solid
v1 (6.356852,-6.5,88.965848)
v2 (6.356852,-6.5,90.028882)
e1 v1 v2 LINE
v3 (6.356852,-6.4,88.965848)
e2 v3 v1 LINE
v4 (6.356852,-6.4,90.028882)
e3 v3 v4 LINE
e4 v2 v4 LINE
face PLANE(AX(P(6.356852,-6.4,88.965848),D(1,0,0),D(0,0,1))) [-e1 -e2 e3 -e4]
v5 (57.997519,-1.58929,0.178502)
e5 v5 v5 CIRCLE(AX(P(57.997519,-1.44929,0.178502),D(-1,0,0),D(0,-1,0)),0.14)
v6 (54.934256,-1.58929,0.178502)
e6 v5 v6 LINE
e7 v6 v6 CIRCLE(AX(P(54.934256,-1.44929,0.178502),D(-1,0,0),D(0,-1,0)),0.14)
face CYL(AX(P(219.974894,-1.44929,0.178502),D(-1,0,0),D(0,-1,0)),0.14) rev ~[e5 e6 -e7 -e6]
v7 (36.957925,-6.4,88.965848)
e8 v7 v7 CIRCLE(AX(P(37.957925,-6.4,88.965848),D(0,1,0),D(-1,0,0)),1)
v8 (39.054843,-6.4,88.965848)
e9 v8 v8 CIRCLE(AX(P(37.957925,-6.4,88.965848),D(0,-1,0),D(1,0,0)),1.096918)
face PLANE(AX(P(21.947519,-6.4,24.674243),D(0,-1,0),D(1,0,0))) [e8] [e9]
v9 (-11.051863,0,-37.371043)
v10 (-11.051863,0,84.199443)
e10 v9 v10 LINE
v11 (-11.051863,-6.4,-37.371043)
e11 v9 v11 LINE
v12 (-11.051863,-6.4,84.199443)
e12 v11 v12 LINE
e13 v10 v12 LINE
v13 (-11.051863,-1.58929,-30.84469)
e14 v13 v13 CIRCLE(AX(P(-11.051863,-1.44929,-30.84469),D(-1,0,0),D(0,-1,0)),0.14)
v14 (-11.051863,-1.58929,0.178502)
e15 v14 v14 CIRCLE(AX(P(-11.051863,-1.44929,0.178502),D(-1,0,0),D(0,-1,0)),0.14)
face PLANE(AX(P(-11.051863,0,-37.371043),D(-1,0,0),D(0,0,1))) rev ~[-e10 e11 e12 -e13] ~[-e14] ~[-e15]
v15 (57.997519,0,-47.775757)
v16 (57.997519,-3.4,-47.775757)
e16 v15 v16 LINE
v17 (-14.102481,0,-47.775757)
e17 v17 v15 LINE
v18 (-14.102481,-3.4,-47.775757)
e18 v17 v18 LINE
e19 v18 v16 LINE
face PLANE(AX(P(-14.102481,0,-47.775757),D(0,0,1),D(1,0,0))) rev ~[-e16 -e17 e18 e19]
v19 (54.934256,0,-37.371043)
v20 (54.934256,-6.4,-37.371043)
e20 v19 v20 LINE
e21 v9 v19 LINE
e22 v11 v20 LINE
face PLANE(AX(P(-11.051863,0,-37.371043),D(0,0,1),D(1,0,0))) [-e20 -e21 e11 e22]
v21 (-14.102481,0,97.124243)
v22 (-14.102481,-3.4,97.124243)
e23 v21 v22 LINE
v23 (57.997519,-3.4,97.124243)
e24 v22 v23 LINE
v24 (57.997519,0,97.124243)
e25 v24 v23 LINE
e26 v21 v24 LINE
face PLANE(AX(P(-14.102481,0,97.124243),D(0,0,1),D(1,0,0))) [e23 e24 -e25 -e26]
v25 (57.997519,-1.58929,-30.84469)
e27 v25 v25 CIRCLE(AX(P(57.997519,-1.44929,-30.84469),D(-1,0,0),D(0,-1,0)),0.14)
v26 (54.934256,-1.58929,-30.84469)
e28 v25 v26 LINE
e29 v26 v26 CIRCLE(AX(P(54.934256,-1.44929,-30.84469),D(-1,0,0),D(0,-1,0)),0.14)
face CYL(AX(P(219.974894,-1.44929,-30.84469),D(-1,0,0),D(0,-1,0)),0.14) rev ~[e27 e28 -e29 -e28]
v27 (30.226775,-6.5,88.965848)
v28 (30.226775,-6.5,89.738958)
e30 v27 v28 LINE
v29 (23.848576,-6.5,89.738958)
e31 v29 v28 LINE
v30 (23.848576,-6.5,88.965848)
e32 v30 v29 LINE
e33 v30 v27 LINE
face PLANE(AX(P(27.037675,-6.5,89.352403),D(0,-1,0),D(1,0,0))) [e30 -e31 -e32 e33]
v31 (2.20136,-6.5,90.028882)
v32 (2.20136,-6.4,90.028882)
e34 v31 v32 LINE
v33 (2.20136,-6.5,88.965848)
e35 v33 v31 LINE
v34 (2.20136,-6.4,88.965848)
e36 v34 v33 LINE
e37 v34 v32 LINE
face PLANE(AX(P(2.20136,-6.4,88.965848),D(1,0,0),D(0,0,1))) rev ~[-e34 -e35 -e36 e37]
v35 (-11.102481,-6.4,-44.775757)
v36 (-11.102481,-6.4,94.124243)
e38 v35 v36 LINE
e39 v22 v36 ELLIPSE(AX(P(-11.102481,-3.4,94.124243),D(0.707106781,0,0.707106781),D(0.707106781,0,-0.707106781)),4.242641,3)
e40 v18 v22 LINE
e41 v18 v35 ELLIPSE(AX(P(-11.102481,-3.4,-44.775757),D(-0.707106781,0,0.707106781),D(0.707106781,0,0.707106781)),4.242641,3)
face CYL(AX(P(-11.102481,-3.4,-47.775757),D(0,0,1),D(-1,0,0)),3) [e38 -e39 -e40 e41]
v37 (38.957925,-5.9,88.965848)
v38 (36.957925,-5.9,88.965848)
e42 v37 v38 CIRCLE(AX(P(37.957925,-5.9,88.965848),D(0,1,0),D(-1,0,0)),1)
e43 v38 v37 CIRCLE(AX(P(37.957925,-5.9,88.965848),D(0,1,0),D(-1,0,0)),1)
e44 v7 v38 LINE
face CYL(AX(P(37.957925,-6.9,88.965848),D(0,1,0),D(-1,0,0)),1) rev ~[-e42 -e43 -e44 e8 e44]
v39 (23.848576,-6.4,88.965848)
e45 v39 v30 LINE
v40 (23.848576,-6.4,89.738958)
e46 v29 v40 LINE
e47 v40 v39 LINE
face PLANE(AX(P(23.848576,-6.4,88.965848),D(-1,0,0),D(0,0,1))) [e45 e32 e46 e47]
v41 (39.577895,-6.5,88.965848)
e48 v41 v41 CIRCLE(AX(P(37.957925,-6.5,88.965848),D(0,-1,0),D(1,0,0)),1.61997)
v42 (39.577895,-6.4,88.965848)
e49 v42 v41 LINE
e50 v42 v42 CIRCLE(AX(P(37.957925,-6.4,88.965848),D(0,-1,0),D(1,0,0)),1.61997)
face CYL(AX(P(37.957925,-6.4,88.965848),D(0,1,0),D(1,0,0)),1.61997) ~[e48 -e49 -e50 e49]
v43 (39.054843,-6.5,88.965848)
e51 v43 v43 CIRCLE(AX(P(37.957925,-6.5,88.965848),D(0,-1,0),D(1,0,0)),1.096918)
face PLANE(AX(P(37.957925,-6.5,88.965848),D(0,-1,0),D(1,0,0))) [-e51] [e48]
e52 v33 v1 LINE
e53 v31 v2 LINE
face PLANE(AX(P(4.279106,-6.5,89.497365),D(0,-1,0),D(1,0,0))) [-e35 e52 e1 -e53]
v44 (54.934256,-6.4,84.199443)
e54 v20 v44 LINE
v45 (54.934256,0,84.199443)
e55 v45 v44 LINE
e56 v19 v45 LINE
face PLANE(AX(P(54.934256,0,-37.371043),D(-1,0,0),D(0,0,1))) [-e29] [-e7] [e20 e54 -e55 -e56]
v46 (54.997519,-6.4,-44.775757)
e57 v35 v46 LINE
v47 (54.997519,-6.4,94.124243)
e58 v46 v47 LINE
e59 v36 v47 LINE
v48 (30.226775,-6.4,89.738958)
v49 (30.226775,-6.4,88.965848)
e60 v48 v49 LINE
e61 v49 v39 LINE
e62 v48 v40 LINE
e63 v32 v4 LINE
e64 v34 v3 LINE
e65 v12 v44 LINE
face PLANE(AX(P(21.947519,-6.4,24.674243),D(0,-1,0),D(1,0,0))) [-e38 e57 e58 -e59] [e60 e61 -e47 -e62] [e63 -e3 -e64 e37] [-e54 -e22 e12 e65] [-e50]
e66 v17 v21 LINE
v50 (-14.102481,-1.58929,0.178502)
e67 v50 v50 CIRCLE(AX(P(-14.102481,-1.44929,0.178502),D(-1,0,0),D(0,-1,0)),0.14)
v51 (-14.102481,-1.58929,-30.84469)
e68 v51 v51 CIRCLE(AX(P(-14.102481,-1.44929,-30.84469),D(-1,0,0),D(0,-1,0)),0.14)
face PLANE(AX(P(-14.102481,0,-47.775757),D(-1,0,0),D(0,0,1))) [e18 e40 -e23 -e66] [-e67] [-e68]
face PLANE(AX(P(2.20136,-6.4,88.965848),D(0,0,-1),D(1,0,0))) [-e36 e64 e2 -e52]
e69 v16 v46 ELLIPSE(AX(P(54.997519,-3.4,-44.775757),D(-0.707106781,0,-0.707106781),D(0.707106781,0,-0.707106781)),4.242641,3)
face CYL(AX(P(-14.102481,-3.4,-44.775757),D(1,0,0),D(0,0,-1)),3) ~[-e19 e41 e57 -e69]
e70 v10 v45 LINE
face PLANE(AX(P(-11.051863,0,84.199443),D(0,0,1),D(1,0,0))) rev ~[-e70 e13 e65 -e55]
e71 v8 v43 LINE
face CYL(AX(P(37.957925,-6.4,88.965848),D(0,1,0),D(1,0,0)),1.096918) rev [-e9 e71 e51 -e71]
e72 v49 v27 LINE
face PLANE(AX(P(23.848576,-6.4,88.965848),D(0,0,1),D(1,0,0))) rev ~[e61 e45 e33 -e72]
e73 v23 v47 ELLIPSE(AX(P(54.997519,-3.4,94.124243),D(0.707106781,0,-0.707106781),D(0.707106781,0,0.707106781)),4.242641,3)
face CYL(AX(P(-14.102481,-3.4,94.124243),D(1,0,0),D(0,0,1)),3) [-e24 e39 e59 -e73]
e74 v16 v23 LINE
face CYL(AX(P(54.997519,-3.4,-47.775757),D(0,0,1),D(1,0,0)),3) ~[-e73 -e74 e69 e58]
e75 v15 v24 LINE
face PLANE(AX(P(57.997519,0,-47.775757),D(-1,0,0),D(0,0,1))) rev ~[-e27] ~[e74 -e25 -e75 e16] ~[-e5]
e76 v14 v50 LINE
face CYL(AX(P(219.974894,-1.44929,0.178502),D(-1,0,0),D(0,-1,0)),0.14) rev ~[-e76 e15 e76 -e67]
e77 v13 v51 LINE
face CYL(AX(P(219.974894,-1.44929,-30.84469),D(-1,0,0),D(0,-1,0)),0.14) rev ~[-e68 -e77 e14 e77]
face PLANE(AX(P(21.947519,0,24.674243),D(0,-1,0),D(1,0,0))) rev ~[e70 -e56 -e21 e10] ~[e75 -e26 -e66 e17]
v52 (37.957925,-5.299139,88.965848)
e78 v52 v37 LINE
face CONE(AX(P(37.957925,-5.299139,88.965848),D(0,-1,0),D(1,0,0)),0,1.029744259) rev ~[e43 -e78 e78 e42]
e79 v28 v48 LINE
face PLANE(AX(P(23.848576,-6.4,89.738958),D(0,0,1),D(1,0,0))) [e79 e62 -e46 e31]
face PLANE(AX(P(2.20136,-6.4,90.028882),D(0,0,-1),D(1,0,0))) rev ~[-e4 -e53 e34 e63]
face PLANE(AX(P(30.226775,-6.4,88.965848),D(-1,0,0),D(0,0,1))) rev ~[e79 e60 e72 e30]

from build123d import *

# Parameters (mm, degrees)
F0_W      = 72.1
F0_H      = 144.9
F0_W_2    = 65.9861192107
F0_H_2    = 121.5704865754
F1_DEPTH  = 6.4
F2_R      = 3
F3_R      = 1.6199699766
F3_R_2    = 1.0969181454
F3_W      = 6.3781980425
F3_H      = 0.7731094956
F3_W_2    = 4.1554919444
F3_H_2    = 1.0630339384
F4_DEPTH  = 0.1
F6_D      = 0.28
F13_D     = 2
F13_DEPTH = 0.5
F13_TIP   = 0.600860619


# Not quite as in the source:
# - the program builds the solid bodies; features that only make, move or delete a surface that nothing else refers to are left out


with BuildPart() as f1:
    # F0 (on Front) → F1 (new body)
    with BuildSketch(Plane.XZ):
        with Locations((21.9475186944, 24.6742434323)):
            Rectangle(F0_W, F0_H)
        with Locations((21.9411961734, 23.4142001718)):
            Rectangle(F0_W_2, F0_H_2, mode=Mode.SUBTRACT)
    extrude(amount=F1_DEPTH)

    # F2
    f2_edges = [f1.edges().sort_by_distance(p)[0] for p in [
        (21.947519, -6.4, 97.124243),
        (-14.102481, -6.4, 24.674243),
        (21.947519, -6.4, -47.775757),
        (57.997519, -6.4, 24.674243),
    ]]
    fillet(f2_edges, radius=F2_R)

    # F3 (on face) → F4 (join, symmetric)
    with BuildSketch(Plane.XZ.offset(6.4)):
        with Locations((37.9579253495, 88.9658480883)):
            Circle(F3_R)
        with Locations((37.9579253495, 88.9658480883)):
            Circle(F3_R_2, mode=Mode.SUBTRACT)
        with Locations((27.0376754925, 89.3524028361)):
            Rectangle(F3_W, F3_H)
        with Locations((4.2791056912, 89.4973650575)):
            Rectangle(F3_W_2, F3_H_2)
    extrude(amount=F4_DEPTH, both=True)

    # F6 (through all)
    with Locations(Plane.YZ.offset(57.9975186944)):
        with Locations((-1.4492898481, -30.8446902782), (-1.4492898481, 0.1785024215)):
            Hole(F6_D / 2)

    # F13
    with Locations(Plane.XZ.offset(6.4)):
        with Locations((37.9579253495, 88.9658480883)):
            Hole(F13_D / 2, depth=F13_DEPTH)
            with Locations((0, 0, -(F13_DEPTH + F13_TIP / 2))):  # 118° drill point
                Cone(0, F13_D / 2, F13_TIP, mode=Mode.SUBTRACT)


solid = f1.part
